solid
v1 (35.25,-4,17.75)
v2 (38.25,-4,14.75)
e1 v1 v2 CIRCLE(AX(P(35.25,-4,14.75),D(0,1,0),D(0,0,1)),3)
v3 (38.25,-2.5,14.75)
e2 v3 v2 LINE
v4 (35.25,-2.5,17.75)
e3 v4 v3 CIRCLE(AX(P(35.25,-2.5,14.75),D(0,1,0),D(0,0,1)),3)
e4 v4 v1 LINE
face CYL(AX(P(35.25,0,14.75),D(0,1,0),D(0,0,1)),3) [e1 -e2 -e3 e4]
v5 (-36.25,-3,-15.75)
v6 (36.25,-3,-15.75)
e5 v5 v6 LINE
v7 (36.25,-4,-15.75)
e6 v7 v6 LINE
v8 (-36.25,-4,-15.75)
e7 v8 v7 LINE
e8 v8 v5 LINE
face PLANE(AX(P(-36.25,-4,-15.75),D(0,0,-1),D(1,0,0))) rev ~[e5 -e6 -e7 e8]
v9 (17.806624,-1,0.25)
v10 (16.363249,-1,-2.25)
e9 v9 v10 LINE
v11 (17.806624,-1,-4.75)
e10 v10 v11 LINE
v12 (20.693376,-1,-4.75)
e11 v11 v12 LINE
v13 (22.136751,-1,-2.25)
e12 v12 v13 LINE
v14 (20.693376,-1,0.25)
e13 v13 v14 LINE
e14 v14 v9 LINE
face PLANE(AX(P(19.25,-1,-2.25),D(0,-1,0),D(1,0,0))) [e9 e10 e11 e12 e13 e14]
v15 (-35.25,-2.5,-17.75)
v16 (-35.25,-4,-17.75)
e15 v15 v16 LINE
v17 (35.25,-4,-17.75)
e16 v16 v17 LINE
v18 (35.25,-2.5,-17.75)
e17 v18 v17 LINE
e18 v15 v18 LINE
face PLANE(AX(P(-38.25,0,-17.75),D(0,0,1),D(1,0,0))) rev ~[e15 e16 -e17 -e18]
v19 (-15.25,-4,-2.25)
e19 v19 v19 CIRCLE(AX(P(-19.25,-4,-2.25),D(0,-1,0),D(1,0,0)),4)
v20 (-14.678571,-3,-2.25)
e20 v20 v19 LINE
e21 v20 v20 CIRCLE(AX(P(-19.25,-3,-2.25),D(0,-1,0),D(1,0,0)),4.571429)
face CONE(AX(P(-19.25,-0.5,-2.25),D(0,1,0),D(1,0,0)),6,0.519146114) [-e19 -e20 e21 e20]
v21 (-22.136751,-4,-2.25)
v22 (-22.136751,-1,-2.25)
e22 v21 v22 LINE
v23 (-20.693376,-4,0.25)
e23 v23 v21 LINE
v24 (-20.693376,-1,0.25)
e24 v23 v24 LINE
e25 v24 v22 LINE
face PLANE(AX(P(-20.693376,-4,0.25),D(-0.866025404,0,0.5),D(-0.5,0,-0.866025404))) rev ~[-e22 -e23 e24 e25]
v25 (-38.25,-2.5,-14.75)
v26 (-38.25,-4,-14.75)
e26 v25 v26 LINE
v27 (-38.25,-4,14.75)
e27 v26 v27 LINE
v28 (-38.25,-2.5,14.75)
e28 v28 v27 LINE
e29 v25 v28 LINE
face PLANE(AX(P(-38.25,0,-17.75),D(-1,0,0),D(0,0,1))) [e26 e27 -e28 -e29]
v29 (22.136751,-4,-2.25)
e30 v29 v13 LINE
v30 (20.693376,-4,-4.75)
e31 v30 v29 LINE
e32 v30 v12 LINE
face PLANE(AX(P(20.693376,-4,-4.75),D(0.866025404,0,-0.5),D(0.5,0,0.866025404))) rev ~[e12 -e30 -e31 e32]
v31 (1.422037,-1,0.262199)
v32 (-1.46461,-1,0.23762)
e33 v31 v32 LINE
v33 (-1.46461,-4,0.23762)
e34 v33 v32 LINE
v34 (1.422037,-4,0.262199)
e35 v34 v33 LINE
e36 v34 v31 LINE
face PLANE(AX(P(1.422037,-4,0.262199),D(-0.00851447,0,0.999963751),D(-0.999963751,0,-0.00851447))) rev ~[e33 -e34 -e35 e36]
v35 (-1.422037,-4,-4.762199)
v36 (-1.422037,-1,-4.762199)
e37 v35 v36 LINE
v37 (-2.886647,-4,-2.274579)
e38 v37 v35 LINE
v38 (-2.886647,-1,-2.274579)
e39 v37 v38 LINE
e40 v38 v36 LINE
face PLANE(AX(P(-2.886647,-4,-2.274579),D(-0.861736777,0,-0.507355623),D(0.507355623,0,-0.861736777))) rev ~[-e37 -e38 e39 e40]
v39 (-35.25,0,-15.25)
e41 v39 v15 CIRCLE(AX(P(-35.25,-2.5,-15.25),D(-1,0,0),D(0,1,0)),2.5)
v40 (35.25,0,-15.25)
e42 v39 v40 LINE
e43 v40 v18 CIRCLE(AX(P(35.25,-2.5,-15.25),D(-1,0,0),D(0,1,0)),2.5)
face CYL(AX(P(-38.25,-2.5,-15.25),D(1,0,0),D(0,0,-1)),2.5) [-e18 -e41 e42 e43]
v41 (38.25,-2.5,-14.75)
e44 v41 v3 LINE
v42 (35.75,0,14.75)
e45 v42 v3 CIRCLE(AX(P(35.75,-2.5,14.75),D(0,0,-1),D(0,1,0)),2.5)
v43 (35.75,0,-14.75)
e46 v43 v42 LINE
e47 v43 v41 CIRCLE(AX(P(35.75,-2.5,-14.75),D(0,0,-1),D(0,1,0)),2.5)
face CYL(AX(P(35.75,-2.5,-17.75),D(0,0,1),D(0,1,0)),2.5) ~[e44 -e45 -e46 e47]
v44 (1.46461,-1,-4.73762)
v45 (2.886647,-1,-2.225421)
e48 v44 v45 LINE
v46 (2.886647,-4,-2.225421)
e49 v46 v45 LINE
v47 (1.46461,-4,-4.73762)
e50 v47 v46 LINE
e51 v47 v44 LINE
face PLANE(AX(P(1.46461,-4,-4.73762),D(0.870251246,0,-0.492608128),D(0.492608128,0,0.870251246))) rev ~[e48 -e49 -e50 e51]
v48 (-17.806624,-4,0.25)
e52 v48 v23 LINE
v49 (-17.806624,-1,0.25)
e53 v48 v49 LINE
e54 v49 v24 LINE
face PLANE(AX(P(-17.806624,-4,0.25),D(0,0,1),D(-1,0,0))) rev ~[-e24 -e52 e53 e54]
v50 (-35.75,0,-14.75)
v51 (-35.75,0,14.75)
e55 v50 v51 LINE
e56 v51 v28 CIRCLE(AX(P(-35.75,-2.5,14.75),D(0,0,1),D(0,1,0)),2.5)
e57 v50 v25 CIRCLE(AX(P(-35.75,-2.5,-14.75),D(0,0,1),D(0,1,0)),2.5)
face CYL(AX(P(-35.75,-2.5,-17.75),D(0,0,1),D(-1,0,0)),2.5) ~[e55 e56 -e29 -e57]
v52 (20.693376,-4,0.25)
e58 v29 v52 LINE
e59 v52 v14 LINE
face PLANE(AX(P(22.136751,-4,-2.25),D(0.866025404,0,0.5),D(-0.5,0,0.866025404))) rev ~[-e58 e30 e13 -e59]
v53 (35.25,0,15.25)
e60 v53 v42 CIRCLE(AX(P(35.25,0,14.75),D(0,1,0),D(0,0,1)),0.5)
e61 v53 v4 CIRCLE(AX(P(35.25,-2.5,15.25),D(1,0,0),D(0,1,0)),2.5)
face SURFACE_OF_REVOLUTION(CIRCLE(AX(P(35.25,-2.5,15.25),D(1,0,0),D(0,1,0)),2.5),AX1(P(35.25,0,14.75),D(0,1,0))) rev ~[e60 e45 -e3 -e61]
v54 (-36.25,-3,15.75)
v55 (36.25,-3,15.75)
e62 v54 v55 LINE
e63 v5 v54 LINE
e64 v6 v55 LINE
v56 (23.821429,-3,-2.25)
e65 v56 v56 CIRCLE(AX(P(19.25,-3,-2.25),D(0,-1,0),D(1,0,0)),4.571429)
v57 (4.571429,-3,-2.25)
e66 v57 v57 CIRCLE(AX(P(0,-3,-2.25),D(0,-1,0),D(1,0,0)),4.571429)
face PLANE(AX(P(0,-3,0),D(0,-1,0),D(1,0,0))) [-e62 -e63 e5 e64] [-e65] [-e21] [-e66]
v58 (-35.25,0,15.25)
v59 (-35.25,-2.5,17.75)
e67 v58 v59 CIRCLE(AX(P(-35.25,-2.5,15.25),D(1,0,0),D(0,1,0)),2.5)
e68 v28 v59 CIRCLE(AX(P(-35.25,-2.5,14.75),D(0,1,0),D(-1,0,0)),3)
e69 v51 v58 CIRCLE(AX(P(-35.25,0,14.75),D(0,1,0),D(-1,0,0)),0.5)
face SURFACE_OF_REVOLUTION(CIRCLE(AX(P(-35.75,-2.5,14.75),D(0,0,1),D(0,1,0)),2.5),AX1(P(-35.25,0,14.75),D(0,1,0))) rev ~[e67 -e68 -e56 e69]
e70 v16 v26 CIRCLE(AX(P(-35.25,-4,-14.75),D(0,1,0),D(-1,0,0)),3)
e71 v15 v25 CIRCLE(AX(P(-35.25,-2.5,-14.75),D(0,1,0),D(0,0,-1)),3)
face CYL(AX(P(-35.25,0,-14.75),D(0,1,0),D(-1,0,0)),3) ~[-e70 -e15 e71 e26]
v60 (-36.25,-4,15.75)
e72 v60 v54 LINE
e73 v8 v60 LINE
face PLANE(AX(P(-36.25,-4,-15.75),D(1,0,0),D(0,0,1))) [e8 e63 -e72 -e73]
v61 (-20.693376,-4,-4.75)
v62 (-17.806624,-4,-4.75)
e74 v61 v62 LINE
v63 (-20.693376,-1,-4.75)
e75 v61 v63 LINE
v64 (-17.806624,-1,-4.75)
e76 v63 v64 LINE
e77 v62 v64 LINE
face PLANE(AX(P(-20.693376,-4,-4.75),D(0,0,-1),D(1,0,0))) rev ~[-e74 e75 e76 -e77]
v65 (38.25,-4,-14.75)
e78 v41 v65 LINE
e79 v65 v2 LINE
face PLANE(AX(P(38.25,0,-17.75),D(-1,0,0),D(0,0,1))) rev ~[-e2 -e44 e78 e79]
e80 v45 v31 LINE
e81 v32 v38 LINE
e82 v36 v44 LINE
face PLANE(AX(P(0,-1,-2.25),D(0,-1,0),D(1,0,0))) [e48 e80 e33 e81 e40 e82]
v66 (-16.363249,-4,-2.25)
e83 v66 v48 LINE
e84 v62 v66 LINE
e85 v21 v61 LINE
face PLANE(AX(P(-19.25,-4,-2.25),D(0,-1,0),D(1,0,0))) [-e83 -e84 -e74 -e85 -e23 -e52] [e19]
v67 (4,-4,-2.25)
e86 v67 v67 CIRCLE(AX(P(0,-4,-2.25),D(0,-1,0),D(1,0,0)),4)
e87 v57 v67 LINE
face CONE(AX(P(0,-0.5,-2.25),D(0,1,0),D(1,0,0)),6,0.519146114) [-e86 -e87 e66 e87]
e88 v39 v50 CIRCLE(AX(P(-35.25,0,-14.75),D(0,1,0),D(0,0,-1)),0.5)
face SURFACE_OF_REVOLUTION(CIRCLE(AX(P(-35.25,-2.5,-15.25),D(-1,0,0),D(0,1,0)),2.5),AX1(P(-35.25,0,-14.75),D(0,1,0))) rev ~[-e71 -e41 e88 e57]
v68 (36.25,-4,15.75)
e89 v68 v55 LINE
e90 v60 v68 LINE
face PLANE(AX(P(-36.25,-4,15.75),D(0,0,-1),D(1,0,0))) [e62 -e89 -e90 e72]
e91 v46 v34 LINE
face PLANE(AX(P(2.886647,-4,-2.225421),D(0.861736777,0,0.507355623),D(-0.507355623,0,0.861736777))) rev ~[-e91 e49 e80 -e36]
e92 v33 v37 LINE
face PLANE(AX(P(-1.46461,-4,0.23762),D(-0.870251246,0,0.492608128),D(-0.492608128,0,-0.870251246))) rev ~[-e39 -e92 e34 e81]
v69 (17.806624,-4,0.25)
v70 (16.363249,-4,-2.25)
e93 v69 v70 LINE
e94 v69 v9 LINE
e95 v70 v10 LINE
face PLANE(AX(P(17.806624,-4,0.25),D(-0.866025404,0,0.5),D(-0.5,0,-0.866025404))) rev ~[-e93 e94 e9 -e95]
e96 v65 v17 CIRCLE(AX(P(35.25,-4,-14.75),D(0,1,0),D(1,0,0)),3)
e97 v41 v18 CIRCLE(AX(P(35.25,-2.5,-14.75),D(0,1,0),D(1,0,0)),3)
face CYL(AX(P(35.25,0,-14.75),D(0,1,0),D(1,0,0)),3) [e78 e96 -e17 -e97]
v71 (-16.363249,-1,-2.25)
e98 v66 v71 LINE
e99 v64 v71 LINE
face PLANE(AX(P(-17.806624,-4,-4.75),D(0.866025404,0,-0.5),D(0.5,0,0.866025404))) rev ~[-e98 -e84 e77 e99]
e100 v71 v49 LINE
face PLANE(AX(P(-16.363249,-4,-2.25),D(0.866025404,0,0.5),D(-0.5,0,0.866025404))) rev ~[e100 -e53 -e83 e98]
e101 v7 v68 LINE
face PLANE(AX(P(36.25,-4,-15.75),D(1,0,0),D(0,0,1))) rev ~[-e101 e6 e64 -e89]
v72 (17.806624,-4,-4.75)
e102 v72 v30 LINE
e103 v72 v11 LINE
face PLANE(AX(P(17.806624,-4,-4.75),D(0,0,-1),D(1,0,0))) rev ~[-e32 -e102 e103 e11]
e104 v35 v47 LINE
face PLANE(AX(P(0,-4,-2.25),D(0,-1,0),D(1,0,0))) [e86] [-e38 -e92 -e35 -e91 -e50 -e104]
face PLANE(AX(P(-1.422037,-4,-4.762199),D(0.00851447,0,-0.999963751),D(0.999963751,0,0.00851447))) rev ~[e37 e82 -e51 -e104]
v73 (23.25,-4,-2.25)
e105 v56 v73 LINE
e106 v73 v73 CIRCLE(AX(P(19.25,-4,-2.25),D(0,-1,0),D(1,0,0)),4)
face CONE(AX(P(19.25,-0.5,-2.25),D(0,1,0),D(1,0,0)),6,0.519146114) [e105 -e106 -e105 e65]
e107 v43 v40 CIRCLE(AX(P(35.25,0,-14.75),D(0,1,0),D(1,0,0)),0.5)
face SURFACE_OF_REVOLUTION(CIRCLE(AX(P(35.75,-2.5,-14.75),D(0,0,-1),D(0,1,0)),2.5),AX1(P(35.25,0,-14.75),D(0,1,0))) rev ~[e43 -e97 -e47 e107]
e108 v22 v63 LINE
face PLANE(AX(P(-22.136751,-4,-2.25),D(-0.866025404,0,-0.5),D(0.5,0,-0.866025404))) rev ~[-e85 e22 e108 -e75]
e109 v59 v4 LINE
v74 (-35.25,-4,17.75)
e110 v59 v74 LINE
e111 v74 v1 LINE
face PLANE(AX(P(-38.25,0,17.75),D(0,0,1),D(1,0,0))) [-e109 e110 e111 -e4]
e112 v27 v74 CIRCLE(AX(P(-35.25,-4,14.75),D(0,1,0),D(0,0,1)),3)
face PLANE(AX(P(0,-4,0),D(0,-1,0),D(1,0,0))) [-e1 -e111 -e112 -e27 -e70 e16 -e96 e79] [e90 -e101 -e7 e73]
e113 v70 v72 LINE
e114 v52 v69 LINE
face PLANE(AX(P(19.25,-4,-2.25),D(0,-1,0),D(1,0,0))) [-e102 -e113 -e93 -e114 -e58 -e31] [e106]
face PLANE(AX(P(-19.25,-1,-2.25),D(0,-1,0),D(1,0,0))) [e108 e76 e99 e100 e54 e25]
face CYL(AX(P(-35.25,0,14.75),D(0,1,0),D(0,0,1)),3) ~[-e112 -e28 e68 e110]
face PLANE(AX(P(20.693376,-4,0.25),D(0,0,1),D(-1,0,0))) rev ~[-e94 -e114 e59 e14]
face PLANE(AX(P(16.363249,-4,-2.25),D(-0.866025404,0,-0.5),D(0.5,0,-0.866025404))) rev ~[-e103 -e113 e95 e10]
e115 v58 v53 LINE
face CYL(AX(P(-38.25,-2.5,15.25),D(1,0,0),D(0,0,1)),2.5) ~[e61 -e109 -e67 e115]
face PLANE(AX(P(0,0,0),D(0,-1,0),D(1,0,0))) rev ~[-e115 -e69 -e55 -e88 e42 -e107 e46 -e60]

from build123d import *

# Parameters (mm, degrees)
F0_W          = 76.5
F0_H          = 35.5
F1_DEPTH      = 4
F2_W          = 72.5
F2_H          = 31.5
F3_DEPTH      = 1
F5_R          = 6
F7_DEPTH      = 1
F6_R          = 6
F8_DEPTH      = 1
F13_DEPTH     = 3
F14_R         = 2.5
F15_T1_DEPTH  = 11.5
F15_T4_ANGLE  = 90
F15_T6_ANGLE  = 90
F15_T8_ANGLE  = 90
F15_T10_ANGLE = 90


# Not quite as in the source:
# - a fillet or chamfer that OpenCascade refuses, or shapes differently, is made with other operations: its cross-section is extruded or revolved along the edge and cut away or added


with BuildPart() as f1:
    # F0 (on Front) → F1 (new body)
    with BuildSketch(Plane.XZ):
        Rectangle(F0_W, F0_H)
    extrude(amount=F1_DEPTH)

    # F2 (on face) → F3 (cut)
    with BuildSketch(Plane.XZ.offset(4)):
        Rectangle(F2_W, F2_H)
    extrude(amount=-F3_DEPTH, mode=Mode.SUBTRACT)

    # F5 (on face) → F7 (join)
    with BuildSketch(Plane.XZ.offset(3)):
        with Locations((0, -2.25)):
            Circle(F5_R)
    extrude(amount=F7_DEPTH)

    # F6 (on face) → F8 (join)
    with BuildSketch(Plane.XZ.offset(3)):
        with Locations((19.25, -2.25)):
            Circle(F6_R)
        with Locations((-19.25, -2.25)):
            Circle(F6_R)
    extrude(amount=F8_DEPTH)

    # F9: chamfer of 2 x 3.5 on 3 edges, made by hand


with BuildPart() as f9_tool2:
    # F9_s3 → F9_t4 (revolve)
    with BuildSketch(Plane.XY.offset(-2.25)):
        Polygon((6, -0.5), (4, -4), (6, -4), align=None)
    revolve(axis=Axis((0, -4, -2.25), (0, -1, 0)))

    split(bisect_by=Plane.XZ.offset(3), keep=Keep.TOP)


with BuildPart() as f1_1:
    add(f1.part)

    # F9_t1: cut F9_tool2
    add(f9_tool2.part, mode=Mode.SUBTRACT)


with BuildPart() as f9_tool7:
    # F9_s8 → F9_t9 (revolve)
    with BuildSketch(Plane.XY.offset(-2.25)):
        Polygon((-13.25, -0.5), (-15.25, -4), (-13.25, -4), align=None)
    revolve(axis=Axis((-19.25, -4, -2.25), (0, -1, 0)))

    split(bisect_by=Plane.XZ.offset(3), keep=Keep.TOP)


with BuildPart() as f1_2:
    add(f1_1.part)

    # F9_t6: cut F9_tool7
    add(f9_tool7.part, mode=Mode.SUBTRACT)


with BuildPart() as f9_tool12:
    # F9_s13 → F9_t14 (revolve)
    with BuildSketch(Plane.XY.offset(-2.25)):
        Polygon((25.25, -0.5), (23.25, -4), (25.25, -4), align=None)
    revolve(axis=Axis((19.25, -4, -2.25), (0, -1, 0)))

    split(bisect_by=Plane.XZ.offset(3), keep=Keep.TOP)


with BuildPart() as f1_3:
    add(f1_2.part)

    # F9_t11: cut F9_tool12
    add(f9_tool12.part, mode=Mode.SUBTRACT)

    # F10 (on face) + F12 (on face) + F11 (on face) → F13 (cut)
    with BuildSketch(Plane.XZ.offset(4)):
        Polygon((-1.464609527, 0.2376197995), (-2.8866467048, -2.2745791573), (-1.4220371778, -4.7621989567), (1.464609527, -4.7376197995), (2.8866467048, -2.2254208427), (1.4220371778, 0.2621989567), align=None)
    with BuildSketch(Plane.XZ.offset(4)):
        Polygon((-17.806624327, 0.25), (-20.693375673, 0.25), (-22.1367513459, -2.25), (-20.693375673, -4.75), (-17.806624327, -4.75), (-16.3632486541, -2.25), align=None)
    with BuildSketch(Plane.XZ.offset(4)):
        Polygon((20.693375673, 0.25), (17.806624327, 0.25), (16.3632486541, -2.25), (17.806624327, -4.75), (20.693375673, -4.75), (22.1367513459, -2.25), align=None)
    extrude(amount=-F13_DEPTH, mode=Mode.SUBTRACT)

    # F14
    f14_edges = [f1_3.edges().sort_by_distance(p)[0] for p in [
        (0, 0, 17.75),
        (38.25, 0, 0),
        (0, 0, -17.75),
        (-38.25, 0, 0),
    ]]
    fillet(f14_edges, radius=F14_R)

    # F15: fillet of radius 3 on 8 edges, made by hand

    # F15_s2 → F15_t1 (cut)
    with BuildSketch(Plane.XZ):
        with BuildLine():
            ThreePointArc((35.25, 17.75), (37.3713203436, 16.8713203436), (38.25, 14.75))
            Line((38.25, 14.75), (38.25, 17.75))
            Line((38.25, 17.75), (35.25, 17.75))
        make_face()
        with BuildLine():
            ThreePointArc((38.25, -14.75), (37.3713203436, -16.8713203436), (35.25, -17.75))
            Line((35.25, -17.75), (38.25, -17.75))
            Line((38.25, -17.75), (38.25, -14.75))
        make_face()
        with BuildLine():
            ThreePointArc((-35.25, 17.75), (-37.3713203436, 16.8713203436), (-38.25, 14.75))
            Line((-38.25, 14.75), (-38.25, 17.75))
            Line((-38.25, 17.75), (-35.25, 17.75))
        make_face()
        with BuildLine():
            ThreePointArc((-38.25, -14.75), (-37.3713203436, -16.8713203436), (-35.25, -17.75))
            Line((-35.25, -17.75), (-38.25, -17.75))
            Line((-38.25, -17.75), (-38.25, -14.75))
        make_face()
    extrude(amount=F15_T1_DEPTH, mode=Mode.SUBTRACT)

    # F15_s3 → F15_t4 (revolve, cut)
    with BuildSketch(Plane.YZ.offset(35.25)):
        with BuildLine():
            ThreePointArc((0, 15.25), (-0.732233047, 17.017766953), (-2.5, 17.75))
            Line((-2.5, 17.75), (0, 17.75))
            Line((0, 17.75), (0, 15.25))
        make_face()
    revolve(axis=Axis((35.25, 0, 14.75), (0, 1, 0)), revolution_arc=F15_T4_ANGLE, mode=Mode.SUBTRACT)

    # F15_s5 → F15_t6 (revolve, cut)
    with BuildSketch(Plane.XY.offset(-14.75)):
        with BuildLine():
            ThreePointArc((35.75, 0), (37.517766953, -0.732233047), (38.25, -2.5))
            Line((38.25, -2.5), (38.25, 0))
            Line((38.25, 0), (35.75, 0))
        make_face()
    revolve(axis=Axis((35.25, 0, -14.75), (0, 1, 0)), revolution_arc=F15_T6_ANGLE, mode=Mode.SUBTRACT)

    # F15_s7 → F15_t8 (revolve, cut)
    with BuildSketch(Plane.XY.offset(14.75)):
        with BuildLine():
            ThreePointArc((-35.75, 0), (-37.517766953, -0.732233047), (-38.25, -2.5))
            Line((-38.25, -2.5), (-38.25, 0))
            Line((-38.25, 0), (-35.75, 0))
        make_face()
    revolve(axis=Axis((-35.25, 0, 14.75), (0, 1, 0)), revolution_arc=F15_T8_ANGLE, mode=Mode.SUBTRACT)

    # F15_s9 → F15_t10 (revolve, cut)
    with BuildSketch(Plane.YZ.offset(-35.25)):
        with BuildLine():
            ThreePointArc((0, -15.25), (-0.732233047, -17.017766953), (-2.5, -17.75))
            Line((-2.5, -17.75), (0, -17.75))
            Line((0, -17.75), (0, -15.25))
        make_face()
    revolve(axis=Axis((-35.25, 0, -14.75), (0, 1, 0)), revolution_arc=F15_T10_ANGLE, mode=Mode.SUBTRACT)


solid = f1_3.part
